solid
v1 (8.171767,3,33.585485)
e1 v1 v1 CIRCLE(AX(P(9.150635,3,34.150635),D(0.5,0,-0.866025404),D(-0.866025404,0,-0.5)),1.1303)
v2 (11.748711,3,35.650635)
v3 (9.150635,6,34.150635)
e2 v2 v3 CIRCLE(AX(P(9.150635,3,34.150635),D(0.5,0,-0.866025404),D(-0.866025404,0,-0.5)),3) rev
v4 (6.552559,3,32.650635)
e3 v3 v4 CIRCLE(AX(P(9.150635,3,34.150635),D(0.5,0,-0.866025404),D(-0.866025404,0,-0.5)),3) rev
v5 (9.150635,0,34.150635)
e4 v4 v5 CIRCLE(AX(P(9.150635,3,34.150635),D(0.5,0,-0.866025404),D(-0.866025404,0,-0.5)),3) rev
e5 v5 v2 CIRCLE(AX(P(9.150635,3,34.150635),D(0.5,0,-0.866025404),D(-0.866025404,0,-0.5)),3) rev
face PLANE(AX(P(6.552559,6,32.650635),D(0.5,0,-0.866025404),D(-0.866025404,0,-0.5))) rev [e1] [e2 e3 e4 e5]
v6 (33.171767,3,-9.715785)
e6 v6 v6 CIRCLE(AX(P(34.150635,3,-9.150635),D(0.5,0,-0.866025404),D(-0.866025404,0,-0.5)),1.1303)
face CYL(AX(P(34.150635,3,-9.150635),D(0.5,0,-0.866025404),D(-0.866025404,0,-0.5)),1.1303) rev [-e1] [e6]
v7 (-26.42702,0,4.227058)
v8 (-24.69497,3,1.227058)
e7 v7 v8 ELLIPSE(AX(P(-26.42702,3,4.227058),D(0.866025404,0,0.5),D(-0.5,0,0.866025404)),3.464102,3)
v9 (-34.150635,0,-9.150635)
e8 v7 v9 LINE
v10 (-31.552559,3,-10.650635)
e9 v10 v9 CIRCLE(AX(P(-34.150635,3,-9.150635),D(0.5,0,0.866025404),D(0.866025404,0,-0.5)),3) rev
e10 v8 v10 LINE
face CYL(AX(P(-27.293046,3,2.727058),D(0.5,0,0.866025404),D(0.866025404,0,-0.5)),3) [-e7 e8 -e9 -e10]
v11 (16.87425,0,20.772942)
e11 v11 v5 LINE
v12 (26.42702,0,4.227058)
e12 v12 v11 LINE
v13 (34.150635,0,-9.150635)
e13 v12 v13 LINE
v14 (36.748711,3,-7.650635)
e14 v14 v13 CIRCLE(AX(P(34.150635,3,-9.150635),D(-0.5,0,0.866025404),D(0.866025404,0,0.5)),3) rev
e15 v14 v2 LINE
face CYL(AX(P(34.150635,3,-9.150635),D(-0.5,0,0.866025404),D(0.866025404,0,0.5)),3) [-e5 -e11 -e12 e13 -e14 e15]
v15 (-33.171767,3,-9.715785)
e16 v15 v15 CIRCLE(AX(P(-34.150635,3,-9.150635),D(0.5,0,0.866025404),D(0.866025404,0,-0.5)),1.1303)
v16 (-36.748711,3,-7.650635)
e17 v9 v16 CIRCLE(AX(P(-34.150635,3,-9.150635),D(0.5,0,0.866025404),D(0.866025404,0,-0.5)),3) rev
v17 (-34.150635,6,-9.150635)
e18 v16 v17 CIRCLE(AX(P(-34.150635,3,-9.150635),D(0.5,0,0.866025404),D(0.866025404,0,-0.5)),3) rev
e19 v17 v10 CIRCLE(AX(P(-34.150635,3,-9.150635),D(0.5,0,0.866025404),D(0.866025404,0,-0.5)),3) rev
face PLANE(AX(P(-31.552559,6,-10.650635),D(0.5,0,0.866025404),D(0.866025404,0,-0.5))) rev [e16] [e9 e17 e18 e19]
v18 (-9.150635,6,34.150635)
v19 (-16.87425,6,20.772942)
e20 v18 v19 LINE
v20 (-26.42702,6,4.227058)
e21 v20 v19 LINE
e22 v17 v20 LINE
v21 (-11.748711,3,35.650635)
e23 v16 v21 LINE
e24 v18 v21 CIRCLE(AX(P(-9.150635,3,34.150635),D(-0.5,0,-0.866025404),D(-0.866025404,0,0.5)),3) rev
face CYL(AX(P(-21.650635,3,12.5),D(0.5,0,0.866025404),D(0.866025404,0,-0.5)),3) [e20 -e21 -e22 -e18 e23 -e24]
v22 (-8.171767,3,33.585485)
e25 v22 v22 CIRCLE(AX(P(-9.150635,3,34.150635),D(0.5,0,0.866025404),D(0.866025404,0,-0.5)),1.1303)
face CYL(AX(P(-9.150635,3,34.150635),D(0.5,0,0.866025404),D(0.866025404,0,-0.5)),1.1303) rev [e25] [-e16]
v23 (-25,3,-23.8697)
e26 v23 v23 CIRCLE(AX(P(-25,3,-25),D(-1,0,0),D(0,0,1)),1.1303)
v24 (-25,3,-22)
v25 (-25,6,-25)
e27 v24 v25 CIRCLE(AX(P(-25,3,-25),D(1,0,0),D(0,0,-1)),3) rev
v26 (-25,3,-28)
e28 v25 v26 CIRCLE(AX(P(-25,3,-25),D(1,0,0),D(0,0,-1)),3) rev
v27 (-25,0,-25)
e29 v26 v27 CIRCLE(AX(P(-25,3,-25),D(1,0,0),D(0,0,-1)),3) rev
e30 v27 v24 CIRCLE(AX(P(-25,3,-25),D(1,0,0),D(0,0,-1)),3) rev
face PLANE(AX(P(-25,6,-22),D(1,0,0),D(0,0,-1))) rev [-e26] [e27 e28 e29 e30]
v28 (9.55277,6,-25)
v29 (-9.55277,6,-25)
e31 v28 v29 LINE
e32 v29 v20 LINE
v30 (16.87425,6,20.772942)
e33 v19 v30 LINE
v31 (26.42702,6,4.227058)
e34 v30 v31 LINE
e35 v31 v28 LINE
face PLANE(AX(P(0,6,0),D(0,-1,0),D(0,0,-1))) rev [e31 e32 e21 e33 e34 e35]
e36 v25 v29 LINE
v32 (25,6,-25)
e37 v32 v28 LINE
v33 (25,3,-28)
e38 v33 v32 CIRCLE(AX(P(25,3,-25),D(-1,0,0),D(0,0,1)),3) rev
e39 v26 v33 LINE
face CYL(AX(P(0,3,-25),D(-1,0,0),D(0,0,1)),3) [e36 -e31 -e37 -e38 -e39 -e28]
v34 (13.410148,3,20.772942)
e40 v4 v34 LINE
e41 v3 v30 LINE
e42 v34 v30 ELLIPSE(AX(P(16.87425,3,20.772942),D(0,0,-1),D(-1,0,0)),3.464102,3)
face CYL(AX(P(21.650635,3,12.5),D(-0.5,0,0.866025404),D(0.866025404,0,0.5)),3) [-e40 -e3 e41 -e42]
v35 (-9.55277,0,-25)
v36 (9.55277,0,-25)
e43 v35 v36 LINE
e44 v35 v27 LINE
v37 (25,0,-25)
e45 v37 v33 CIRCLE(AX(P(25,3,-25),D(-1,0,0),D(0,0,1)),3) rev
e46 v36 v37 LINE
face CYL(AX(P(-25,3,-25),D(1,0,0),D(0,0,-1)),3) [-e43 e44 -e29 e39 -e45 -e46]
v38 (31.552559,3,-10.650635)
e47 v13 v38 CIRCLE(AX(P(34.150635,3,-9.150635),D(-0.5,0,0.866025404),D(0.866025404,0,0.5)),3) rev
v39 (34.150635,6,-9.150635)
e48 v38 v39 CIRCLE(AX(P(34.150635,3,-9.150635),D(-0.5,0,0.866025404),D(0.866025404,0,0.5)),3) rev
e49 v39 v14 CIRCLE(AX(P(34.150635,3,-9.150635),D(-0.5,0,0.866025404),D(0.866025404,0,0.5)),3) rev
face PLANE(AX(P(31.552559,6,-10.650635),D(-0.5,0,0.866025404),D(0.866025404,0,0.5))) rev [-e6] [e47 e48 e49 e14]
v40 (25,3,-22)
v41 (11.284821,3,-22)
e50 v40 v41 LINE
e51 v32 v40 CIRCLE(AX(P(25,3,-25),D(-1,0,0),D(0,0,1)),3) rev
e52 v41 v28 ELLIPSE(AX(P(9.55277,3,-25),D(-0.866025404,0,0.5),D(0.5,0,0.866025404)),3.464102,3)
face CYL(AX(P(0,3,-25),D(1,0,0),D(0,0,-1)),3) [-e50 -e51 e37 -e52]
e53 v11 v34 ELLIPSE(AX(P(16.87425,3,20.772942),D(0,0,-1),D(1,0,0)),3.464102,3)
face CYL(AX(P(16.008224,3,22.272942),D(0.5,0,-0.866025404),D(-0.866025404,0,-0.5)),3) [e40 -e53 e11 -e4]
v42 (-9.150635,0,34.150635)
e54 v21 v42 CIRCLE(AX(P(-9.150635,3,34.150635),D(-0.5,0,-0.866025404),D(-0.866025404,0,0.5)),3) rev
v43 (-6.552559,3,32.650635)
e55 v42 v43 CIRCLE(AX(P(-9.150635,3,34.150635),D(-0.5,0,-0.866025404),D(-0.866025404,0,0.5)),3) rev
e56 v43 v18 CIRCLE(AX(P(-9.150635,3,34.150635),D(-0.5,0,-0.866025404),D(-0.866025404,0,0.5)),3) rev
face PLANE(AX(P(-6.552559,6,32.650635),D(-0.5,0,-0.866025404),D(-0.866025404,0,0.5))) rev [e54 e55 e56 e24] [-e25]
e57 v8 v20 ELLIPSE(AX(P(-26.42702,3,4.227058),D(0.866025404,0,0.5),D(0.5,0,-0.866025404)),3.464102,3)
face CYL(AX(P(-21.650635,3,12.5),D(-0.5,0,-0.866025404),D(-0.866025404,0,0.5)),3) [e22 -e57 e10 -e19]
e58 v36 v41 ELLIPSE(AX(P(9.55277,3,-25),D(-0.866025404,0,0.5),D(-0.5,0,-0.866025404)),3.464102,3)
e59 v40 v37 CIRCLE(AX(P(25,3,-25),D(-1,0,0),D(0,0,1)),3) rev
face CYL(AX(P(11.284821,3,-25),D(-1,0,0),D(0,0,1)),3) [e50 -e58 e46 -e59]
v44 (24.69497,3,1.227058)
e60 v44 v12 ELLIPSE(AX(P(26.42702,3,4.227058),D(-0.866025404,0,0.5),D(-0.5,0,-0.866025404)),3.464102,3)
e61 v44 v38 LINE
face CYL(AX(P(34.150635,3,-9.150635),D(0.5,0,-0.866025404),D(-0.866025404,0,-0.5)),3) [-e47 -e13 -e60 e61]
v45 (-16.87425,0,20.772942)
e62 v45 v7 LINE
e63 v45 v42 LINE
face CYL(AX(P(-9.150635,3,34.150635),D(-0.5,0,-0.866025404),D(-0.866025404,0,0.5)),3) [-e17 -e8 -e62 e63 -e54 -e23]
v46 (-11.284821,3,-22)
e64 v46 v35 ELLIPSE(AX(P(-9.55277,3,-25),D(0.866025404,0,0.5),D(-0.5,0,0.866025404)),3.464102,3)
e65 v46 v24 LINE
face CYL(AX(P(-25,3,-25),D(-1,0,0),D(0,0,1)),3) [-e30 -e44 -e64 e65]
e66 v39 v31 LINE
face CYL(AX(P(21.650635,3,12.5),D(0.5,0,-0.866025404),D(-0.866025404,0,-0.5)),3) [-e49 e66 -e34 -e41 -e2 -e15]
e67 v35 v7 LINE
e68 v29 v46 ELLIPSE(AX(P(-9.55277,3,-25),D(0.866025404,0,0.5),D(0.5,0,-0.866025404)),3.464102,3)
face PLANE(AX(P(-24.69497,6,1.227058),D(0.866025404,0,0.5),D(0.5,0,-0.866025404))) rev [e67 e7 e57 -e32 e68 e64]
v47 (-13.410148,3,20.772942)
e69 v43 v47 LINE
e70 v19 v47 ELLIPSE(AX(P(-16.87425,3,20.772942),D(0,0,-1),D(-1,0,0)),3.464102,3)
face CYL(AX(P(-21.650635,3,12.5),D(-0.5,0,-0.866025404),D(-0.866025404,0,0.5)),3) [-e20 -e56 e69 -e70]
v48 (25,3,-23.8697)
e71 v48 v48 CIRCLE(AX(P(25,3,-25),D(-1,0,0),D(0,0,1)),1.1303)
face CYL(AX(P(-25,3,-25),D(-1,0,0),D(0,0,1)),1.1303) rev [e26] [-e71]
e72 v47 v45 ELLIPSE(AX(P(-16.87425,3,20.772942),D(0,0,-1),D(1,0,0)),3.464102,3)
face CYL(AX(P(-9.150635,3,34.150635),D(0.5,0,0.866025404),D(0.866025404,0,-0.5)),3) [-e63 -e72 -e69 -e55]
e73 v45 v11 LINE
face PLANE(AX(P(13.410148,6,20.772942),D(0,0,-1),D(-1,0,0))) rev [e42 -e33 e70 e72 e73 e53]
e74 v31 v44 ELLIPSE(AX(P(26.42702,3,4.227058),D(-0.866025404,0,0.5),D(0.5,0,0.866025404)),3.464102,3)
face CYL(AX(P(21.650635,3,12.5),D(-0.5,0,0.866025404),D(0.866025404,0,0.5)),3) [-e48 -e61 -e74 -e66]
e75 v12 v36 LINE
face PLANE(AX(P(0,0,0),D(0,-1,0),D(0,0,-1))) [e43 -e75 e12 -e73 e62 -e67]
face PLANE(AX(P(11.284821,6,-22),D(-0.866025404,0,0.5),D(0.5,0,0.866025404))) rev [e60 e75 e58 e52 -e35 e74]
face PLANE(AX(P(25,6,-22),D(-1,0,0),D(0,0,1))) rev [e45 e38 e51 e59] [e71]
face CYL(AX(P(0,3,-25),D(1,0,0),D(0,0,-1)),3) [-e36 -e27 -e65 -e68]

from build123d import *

# Parameters (mm, degrees)
BOSS_EXTRUDE1_DEPTH   = 6
FILLET3_R             = 3
F_4_40_TAPPED_HOLE1_D = 2.2606
F_4_40_TAPPED_HOLE2_D = 2.2606
F_4_40_TAPPED_HOLE3_D = 2.2606


with BuildPart() as part:
    # Sketch1 → Boss-Extrude1 (new body)
    with BuildSketch(Plane(origin=(0, 0, 0), x_dir=(1, 0, 0), z_dir=(0, 1, 0))):
        Polygon((-24.694969511, -1.227058116), (-11.284821255, 22), (-25, 22), (-25, 28), (25, 28), (25, 22), (11.284821255, 22), (24.694969511, -1.227058116), (31.552558883, 10.650635095), (36.748711306, 7.650635095), (11.748711306, -35.650635095), (6.552558883, -32.650635095), (13.410148256, -20.772941884), (-13.410148256, -20.772941884), (-6.552558883, -32.650635095), (-11.748711306, -35.650635095), (-36.748711306, 7.650635095), (-31.552558883, 10.650635095), align=None)
    extrude(amount=BOSS_EXTRUDE1_DEPTH)

    # Fillet3
    fillet3_edges = [part.edges().sort_by_distance(p)[0] for p in [
        (24.248711306, 0, 14),
        (24.248711306, 6, 14),
        (0, 0, -28),
        (0, 6, -28),
        (-24.248711306, 0, 14),
        (-24.248711306, 6, 14),
        (9.981353569, 0, 26.711788489),
        (9.981353569, 6, 26.711788489),
        (28.123764197, 0, -4.711788489),
        (28.123764197, 6, -4.711788489),
        (18.142410628, 0, -22),
        (18.142410628, 6, -22),
        (-18.142410628, 6, -22),
        (-18.142410628, 0, -22),
        (-28.123764197, 6, -4.711788489),
        (-28.123764197, 0, -4.711788489),
        (-9.981353569, 0, 26.711788489),
        (-9.981353569, 6, 26.711788489),
    ]]
    fillet(fillet3_edges, radius=FILLET3_R - 0.0001)  # a hair under: the kernel refuses the full size

    # #4-40 Tapped Hole1 (through all)
    with Locations(Plane(origin=(12.5, 0, 21.650635095), x_dir=(0.866025403784438, 0, -0.5000000000000012), z_dir=(0.5000000000000012, 0, 0.866025403784438))):
        with Locations((-25, 3)):
            Hole(F_4_40_TAPPED_HOLE1_D / 2)

    # #4-40 Tapped Hole2 (through all)
    with Locations(Plane(origin=(12.5, 0, -21.650635095), x_dir=(-0.8660254037844389, 0, -0.4999999999999995), z_dir=(0.4999999999999995, 0, -0.8660254037844389))):
        with Locations((-25, 3)):
            Hole(F_4_40_TAPPED_HOLE2_D / 2)

    # #4-40 Tapped Hole3 (through all)
    with Locations(Plane.ZY.offset(25)):
        with Locations((-25, 3)):
            Hole(F_4_40_TAPPED_HOLE3_D / 2)


solid = part.part
